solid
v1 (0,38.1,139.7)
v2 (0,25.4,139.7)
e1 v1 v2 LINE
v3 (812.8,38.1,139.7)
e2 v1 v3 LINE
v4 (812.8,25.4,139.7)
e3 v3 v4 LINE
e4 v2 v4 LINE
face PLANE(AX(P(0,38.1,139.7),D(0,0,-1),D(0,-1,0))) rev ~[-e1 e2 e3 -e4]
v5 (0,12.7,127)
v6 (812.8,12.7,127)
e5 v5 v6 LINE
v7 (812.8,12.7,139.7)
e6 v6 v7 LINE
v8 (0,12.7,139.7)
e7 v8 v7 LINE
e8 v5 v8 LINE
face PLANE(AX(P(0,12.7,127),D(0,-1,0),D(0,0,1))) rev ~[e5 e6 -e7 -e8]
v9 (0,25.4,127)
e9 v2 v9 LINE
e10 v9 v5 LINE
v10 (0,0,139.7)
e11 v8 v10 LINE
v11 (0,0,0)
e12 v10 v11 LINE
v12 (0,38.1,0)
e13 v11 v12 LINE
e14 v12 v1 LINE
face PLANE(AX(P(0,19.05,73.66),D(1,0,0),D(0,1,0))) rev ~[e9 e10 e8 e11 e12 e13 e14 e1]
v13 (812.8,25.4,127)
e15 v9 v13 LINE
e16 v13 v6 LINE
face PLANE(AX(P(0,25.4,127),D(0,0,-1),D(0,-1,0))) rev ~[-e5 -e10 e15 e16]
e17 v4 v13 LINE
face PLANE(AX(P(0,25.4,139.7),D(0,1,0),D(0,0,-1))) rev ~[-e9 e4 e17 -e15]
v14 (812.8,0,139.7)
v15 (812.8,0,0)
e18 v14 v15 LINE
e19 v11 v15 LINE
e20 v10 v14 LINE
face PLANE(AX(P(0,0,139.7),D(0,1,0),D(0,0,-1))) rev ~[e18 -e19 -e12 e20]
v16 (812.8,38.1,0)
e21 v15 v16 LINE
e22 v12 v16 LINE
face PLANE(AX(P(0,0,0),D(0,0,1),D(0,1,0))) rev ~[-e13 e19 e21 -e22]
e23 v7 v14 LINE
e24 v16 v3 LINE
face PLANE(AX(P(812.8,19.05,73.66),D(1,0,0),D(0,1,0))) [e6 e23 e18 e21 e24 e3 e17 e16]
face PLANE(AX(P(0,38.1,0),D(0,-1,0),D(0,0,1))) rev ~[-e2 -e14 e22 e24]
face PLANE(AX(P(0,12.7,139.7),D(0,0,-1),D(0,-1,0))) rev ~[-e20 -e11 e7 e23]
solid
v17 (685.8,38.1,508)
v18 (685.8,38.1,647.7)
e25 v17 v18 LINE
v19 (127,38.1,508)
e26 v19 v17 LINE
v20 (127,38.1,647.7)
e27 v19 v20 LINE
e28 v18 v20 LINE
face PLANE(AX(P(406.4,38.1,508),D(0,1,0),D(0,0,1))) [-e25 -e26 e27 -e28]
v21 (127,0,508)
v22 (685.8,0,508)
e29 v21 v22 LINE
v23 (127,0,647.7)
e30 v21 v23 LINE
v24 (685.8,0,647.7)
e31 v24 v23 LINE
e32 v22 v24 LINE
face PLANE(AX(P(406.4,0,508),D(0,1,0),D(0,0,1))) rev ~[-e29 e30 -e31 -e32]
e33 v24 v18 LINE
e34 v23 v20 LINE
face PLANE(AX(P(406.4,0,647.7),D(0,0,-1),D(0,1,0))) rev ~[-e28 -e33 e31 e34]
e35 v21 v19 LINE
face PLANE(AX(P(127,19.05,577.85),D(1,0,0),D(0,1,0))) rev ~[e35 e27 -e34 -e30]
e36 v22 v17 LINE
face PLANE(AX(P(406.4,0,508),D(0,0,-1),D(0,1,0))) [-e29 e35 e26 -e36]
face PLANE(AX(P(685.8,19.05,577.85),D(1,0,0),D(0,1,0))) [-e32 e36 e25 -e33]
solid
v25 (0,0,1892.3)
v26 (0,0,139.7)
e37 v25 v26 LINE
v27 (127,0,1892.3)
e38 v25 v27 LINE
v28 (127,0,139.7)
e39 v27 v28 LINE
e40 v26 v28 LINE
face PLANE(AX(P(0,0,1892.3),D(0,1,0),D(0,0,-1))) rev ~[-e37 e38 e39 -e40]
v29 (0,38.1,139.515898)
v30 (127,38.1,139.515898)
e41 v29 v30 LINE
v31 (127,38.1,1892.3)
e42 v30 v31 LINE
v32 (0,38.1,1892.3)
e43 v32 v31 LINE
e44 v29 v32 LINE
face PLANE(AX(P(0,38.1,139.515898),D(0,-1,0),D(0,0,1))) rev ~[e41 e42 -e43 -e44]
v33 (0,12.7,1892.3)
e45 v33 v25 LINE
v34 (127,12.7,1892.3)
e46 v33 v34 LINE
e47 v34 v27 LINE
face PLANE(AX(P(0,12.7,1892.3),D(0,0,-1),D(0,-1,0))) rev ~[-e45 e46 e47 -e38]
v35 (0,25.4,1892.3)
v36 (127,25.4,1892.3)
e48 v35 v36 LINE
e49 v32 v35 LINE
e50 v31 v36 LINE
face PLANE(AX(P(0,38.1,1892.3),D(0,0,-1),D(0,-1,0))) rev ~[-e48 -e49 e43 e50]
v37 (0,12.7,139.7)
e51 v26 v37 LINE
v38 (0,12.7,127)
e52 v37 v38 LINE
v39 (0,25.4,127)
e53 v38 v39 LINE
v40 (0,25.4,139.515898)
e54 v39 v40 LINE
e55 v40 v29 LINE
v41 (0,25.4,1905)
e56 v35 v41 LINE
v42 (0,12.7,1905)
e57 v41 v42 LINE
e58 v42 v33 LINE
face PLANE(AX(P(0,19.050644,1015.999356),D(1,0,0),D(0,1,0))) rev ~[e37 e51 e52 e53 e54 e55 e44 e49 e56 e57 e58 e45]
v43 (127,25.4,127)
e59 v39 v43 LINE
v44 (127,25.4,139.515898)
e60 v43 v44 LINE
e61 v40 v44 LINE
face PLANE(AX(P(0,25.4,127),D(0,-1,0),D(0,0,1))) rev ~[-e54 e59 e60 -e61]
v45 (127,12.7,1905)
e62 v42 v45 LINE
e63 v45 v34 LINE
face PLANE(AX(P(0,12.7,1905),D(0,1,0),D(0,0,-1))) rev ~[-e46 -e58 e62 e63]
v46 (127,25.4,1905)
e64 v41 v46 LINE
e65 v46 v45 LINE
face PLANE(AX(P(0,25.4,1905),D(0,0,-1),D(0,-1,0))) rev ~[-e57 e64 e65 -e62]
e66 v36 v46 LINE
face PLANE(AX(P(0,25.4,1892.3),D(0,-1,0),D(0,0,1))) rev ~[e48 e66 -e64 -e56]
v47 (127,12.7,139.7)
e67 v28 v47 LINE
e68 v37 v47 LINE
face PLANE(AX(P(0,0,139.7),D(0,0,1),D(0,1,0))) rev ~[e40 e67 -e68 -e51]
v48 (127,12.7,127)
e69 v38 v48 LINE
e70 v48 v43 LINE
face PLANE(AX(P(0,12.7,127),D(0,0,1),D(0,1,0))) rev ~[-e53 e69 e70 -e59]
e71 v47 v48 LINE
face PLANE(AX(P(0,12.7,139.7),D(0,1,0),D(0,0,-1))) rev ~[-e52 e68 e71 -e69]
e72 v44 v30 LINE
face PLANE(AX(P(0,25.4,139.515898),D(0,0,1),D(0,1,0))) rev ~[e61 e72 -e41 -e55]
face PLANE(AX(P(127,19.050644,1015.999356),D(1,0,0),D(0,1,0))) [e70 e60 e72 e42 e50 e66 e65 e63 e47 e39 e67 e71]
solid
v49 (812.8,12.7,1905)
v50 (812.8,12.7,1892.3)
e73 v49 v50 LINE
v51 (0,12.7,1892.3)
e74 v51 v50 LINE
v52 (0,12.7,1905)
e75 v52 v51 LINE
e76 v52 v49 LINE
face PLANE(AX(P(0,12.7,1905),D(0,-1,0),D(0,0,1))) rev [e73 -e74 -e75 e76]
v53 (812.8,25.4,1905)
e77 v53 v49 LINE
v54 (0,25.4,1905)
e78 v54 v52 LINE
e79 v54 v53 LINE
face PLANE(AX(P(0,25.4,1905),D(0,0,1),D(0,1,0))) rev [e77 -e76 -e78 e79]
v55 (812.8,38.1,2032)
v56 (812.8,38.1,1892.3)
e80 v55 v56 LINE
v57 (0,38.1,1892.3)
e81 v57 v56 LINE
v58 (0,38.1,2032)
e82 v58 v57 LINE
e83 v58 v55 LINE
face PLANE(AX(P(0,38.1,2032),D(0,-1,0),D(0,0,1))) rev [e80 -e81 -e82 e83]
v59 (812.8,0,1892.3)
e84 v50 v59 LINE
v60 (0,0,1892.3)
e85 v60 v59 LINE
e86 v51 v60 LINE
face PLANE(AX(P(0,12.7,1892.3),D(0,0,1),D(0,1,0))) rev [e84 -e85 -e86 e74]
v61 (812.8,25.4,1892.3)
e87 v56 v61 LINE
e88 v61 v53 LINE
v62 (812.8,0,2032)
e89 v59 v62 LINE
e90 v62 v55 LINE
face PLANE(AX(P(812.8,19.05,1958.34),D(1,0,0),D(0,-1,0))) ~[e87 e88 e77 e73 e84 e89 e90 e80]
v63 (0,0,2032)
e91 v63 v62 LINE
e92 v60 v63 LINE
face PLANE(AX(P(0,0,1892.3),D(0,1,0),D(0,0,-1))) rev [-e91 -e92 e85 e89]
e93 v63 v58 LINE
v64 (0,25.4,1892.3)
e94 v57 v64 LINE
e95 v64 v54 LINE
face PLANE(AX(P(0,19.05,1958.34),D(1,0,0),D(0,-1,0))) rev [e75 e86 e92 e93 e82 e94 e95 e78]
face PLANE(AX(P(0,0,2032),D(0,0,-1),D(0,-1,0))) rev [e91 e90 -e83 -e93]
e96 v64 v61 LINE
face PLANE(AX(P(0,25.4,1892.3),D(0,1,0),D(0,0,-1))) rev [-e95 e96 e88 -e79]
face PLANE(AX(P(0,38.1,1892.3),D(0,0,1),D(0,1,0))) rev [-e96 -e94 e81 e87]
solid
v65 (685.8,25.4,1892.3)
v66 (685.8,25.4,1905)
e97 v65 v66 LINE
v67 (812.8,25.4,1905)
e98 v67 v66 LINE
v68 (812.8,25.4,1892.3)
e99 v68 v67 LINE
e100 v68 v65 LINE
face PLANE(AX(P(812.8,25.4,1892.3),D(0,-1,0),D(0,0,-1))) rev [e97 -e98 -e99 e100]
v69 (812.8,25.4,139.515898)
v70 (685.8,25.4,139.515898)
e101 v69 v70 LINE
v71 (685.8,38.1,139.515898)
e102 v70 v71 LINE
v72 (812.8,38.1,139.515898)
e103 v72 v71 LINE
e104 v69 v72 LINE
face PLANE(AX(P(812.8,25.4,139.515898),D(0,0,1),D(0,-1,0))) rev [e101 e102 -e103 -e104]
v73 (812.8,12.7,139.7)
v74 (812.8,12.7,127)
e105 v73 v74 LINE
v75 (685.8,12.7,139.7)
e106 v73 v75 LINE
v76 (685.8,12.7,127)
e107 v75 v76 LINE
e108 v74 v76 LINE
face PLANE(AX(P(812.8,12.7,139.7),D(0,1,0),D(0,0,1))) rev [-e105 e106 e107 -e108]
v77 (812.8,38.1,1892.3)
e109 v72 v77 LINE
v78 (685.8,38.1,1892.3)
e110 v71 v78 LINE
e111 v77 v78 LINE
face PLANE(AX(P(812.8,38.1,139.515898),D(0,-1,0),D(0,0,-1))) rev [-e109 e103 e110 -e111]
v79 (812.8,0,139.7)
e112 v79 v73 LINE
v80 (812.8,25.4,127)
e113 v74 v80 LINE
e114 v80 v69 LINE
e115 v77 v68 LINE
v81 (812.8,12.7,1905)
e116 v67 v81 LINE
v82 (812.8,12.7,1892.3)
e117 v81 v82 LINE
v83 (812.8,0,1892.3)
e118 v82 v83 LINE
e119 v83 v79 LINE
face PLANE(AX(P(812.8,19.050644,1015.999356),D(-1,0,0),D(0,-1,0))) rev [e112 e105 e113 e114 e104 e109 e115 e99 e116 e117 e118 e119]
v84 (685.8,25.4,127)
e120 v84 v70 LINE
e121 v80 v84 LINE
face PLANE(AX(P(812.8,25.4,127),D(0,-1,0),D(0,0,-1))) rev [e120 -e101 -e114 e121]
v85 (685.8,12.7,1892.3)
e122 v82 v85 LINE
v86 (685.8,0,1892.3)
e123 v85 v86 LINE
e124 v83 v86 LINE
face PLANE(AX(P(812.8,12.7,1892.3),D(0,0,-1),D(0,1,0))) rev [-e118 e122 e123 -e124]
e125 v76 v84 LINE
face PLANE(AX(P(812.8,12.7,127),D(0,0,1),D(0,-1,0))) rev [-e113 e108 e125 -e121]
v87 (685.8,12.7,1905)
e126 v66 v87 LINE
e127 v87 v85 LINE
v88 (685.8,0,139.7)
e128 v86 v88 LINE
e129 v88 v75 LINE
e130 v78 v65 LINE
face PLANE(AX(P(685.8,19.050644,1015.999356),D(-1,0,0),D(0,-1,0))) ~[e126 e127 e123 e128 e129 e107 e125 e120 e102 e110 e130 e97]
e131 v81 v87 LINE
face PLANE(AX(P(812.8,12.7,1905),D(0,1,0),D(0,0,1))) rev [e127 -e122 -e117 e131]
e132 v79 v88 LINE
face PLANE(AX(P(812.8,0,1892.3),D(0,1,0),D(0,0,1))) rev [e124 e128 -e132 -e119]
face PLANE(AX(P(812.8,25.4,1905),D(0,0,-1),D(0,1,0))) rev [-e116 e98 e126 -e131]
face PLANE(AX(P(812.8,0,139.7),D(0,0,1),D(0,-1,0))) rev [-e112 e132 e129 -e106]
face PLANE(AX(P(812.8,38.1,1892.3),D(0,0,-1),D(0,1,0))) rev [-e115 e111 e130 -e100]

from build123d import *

# Parameters (mm, degrees)
F1_DEPTH  = 812.8
F5_DEPTH  = 127
F12_W     = 38.1
F12_H     = 139.7
F13_DEPTH = 279.4


# Not quite as in the source:
# - a feature of the source that left no trace in its solid (it failed there, or was rolled back) is left out


with BuildPart() as f1:
    # F0 (on Right) → F1 (new body)
    with BuildSketch(Plane.YZ):
        Polygon((0, 139.7), (0, 0), (38.1, 0), (38.1, 139.7), (25.4, 139.7), (25.4, 127), (12.7, 127), (12.7, 139.7), align=None)
    extrude(amount=F1_DEPTH)


with BuildPart() as f3_1:
    # F3: instance of F1
    add(f1.part.mirror(Plane.XY.offset(1016)))


with BuildPart() as f5:
    # F4 (on Right) → F5 (new body)
    with BuildSketch(Plane.YZ):
        Polygon((0, 1892.3), (0, 139.7), (12.7, 139.7), (12.7, 127), (25.4, 127), (25.4, 139.51589757), (38.1, 139.51589757), (38.1, 1892.3), (25.4, 1892.3), (25.4, 1905), (12.7, 1905), (12.7, 1892.3), align=None)
    extrude(amount=F5_DEPTH)


with BuildPart() as f7_1:
    # F7: instance of F5
    add(f5.part.mirror(Plane.YZ.offset(406.4)))


with BuildPart() as f13:
    # F12 (on offset) → F13 (new body, symmetric)
    with BuildSketch(Plane.YZ.offset(406.4)):
        with Locations((19.05, 577.85)):
            Rectangle(F12_W, F12_H)
    extrude(amount=F13_DEPTH, both=True)


solid = Compound([f1.part, f3_1.part, f5.part, f7_1.part, f13.part])
